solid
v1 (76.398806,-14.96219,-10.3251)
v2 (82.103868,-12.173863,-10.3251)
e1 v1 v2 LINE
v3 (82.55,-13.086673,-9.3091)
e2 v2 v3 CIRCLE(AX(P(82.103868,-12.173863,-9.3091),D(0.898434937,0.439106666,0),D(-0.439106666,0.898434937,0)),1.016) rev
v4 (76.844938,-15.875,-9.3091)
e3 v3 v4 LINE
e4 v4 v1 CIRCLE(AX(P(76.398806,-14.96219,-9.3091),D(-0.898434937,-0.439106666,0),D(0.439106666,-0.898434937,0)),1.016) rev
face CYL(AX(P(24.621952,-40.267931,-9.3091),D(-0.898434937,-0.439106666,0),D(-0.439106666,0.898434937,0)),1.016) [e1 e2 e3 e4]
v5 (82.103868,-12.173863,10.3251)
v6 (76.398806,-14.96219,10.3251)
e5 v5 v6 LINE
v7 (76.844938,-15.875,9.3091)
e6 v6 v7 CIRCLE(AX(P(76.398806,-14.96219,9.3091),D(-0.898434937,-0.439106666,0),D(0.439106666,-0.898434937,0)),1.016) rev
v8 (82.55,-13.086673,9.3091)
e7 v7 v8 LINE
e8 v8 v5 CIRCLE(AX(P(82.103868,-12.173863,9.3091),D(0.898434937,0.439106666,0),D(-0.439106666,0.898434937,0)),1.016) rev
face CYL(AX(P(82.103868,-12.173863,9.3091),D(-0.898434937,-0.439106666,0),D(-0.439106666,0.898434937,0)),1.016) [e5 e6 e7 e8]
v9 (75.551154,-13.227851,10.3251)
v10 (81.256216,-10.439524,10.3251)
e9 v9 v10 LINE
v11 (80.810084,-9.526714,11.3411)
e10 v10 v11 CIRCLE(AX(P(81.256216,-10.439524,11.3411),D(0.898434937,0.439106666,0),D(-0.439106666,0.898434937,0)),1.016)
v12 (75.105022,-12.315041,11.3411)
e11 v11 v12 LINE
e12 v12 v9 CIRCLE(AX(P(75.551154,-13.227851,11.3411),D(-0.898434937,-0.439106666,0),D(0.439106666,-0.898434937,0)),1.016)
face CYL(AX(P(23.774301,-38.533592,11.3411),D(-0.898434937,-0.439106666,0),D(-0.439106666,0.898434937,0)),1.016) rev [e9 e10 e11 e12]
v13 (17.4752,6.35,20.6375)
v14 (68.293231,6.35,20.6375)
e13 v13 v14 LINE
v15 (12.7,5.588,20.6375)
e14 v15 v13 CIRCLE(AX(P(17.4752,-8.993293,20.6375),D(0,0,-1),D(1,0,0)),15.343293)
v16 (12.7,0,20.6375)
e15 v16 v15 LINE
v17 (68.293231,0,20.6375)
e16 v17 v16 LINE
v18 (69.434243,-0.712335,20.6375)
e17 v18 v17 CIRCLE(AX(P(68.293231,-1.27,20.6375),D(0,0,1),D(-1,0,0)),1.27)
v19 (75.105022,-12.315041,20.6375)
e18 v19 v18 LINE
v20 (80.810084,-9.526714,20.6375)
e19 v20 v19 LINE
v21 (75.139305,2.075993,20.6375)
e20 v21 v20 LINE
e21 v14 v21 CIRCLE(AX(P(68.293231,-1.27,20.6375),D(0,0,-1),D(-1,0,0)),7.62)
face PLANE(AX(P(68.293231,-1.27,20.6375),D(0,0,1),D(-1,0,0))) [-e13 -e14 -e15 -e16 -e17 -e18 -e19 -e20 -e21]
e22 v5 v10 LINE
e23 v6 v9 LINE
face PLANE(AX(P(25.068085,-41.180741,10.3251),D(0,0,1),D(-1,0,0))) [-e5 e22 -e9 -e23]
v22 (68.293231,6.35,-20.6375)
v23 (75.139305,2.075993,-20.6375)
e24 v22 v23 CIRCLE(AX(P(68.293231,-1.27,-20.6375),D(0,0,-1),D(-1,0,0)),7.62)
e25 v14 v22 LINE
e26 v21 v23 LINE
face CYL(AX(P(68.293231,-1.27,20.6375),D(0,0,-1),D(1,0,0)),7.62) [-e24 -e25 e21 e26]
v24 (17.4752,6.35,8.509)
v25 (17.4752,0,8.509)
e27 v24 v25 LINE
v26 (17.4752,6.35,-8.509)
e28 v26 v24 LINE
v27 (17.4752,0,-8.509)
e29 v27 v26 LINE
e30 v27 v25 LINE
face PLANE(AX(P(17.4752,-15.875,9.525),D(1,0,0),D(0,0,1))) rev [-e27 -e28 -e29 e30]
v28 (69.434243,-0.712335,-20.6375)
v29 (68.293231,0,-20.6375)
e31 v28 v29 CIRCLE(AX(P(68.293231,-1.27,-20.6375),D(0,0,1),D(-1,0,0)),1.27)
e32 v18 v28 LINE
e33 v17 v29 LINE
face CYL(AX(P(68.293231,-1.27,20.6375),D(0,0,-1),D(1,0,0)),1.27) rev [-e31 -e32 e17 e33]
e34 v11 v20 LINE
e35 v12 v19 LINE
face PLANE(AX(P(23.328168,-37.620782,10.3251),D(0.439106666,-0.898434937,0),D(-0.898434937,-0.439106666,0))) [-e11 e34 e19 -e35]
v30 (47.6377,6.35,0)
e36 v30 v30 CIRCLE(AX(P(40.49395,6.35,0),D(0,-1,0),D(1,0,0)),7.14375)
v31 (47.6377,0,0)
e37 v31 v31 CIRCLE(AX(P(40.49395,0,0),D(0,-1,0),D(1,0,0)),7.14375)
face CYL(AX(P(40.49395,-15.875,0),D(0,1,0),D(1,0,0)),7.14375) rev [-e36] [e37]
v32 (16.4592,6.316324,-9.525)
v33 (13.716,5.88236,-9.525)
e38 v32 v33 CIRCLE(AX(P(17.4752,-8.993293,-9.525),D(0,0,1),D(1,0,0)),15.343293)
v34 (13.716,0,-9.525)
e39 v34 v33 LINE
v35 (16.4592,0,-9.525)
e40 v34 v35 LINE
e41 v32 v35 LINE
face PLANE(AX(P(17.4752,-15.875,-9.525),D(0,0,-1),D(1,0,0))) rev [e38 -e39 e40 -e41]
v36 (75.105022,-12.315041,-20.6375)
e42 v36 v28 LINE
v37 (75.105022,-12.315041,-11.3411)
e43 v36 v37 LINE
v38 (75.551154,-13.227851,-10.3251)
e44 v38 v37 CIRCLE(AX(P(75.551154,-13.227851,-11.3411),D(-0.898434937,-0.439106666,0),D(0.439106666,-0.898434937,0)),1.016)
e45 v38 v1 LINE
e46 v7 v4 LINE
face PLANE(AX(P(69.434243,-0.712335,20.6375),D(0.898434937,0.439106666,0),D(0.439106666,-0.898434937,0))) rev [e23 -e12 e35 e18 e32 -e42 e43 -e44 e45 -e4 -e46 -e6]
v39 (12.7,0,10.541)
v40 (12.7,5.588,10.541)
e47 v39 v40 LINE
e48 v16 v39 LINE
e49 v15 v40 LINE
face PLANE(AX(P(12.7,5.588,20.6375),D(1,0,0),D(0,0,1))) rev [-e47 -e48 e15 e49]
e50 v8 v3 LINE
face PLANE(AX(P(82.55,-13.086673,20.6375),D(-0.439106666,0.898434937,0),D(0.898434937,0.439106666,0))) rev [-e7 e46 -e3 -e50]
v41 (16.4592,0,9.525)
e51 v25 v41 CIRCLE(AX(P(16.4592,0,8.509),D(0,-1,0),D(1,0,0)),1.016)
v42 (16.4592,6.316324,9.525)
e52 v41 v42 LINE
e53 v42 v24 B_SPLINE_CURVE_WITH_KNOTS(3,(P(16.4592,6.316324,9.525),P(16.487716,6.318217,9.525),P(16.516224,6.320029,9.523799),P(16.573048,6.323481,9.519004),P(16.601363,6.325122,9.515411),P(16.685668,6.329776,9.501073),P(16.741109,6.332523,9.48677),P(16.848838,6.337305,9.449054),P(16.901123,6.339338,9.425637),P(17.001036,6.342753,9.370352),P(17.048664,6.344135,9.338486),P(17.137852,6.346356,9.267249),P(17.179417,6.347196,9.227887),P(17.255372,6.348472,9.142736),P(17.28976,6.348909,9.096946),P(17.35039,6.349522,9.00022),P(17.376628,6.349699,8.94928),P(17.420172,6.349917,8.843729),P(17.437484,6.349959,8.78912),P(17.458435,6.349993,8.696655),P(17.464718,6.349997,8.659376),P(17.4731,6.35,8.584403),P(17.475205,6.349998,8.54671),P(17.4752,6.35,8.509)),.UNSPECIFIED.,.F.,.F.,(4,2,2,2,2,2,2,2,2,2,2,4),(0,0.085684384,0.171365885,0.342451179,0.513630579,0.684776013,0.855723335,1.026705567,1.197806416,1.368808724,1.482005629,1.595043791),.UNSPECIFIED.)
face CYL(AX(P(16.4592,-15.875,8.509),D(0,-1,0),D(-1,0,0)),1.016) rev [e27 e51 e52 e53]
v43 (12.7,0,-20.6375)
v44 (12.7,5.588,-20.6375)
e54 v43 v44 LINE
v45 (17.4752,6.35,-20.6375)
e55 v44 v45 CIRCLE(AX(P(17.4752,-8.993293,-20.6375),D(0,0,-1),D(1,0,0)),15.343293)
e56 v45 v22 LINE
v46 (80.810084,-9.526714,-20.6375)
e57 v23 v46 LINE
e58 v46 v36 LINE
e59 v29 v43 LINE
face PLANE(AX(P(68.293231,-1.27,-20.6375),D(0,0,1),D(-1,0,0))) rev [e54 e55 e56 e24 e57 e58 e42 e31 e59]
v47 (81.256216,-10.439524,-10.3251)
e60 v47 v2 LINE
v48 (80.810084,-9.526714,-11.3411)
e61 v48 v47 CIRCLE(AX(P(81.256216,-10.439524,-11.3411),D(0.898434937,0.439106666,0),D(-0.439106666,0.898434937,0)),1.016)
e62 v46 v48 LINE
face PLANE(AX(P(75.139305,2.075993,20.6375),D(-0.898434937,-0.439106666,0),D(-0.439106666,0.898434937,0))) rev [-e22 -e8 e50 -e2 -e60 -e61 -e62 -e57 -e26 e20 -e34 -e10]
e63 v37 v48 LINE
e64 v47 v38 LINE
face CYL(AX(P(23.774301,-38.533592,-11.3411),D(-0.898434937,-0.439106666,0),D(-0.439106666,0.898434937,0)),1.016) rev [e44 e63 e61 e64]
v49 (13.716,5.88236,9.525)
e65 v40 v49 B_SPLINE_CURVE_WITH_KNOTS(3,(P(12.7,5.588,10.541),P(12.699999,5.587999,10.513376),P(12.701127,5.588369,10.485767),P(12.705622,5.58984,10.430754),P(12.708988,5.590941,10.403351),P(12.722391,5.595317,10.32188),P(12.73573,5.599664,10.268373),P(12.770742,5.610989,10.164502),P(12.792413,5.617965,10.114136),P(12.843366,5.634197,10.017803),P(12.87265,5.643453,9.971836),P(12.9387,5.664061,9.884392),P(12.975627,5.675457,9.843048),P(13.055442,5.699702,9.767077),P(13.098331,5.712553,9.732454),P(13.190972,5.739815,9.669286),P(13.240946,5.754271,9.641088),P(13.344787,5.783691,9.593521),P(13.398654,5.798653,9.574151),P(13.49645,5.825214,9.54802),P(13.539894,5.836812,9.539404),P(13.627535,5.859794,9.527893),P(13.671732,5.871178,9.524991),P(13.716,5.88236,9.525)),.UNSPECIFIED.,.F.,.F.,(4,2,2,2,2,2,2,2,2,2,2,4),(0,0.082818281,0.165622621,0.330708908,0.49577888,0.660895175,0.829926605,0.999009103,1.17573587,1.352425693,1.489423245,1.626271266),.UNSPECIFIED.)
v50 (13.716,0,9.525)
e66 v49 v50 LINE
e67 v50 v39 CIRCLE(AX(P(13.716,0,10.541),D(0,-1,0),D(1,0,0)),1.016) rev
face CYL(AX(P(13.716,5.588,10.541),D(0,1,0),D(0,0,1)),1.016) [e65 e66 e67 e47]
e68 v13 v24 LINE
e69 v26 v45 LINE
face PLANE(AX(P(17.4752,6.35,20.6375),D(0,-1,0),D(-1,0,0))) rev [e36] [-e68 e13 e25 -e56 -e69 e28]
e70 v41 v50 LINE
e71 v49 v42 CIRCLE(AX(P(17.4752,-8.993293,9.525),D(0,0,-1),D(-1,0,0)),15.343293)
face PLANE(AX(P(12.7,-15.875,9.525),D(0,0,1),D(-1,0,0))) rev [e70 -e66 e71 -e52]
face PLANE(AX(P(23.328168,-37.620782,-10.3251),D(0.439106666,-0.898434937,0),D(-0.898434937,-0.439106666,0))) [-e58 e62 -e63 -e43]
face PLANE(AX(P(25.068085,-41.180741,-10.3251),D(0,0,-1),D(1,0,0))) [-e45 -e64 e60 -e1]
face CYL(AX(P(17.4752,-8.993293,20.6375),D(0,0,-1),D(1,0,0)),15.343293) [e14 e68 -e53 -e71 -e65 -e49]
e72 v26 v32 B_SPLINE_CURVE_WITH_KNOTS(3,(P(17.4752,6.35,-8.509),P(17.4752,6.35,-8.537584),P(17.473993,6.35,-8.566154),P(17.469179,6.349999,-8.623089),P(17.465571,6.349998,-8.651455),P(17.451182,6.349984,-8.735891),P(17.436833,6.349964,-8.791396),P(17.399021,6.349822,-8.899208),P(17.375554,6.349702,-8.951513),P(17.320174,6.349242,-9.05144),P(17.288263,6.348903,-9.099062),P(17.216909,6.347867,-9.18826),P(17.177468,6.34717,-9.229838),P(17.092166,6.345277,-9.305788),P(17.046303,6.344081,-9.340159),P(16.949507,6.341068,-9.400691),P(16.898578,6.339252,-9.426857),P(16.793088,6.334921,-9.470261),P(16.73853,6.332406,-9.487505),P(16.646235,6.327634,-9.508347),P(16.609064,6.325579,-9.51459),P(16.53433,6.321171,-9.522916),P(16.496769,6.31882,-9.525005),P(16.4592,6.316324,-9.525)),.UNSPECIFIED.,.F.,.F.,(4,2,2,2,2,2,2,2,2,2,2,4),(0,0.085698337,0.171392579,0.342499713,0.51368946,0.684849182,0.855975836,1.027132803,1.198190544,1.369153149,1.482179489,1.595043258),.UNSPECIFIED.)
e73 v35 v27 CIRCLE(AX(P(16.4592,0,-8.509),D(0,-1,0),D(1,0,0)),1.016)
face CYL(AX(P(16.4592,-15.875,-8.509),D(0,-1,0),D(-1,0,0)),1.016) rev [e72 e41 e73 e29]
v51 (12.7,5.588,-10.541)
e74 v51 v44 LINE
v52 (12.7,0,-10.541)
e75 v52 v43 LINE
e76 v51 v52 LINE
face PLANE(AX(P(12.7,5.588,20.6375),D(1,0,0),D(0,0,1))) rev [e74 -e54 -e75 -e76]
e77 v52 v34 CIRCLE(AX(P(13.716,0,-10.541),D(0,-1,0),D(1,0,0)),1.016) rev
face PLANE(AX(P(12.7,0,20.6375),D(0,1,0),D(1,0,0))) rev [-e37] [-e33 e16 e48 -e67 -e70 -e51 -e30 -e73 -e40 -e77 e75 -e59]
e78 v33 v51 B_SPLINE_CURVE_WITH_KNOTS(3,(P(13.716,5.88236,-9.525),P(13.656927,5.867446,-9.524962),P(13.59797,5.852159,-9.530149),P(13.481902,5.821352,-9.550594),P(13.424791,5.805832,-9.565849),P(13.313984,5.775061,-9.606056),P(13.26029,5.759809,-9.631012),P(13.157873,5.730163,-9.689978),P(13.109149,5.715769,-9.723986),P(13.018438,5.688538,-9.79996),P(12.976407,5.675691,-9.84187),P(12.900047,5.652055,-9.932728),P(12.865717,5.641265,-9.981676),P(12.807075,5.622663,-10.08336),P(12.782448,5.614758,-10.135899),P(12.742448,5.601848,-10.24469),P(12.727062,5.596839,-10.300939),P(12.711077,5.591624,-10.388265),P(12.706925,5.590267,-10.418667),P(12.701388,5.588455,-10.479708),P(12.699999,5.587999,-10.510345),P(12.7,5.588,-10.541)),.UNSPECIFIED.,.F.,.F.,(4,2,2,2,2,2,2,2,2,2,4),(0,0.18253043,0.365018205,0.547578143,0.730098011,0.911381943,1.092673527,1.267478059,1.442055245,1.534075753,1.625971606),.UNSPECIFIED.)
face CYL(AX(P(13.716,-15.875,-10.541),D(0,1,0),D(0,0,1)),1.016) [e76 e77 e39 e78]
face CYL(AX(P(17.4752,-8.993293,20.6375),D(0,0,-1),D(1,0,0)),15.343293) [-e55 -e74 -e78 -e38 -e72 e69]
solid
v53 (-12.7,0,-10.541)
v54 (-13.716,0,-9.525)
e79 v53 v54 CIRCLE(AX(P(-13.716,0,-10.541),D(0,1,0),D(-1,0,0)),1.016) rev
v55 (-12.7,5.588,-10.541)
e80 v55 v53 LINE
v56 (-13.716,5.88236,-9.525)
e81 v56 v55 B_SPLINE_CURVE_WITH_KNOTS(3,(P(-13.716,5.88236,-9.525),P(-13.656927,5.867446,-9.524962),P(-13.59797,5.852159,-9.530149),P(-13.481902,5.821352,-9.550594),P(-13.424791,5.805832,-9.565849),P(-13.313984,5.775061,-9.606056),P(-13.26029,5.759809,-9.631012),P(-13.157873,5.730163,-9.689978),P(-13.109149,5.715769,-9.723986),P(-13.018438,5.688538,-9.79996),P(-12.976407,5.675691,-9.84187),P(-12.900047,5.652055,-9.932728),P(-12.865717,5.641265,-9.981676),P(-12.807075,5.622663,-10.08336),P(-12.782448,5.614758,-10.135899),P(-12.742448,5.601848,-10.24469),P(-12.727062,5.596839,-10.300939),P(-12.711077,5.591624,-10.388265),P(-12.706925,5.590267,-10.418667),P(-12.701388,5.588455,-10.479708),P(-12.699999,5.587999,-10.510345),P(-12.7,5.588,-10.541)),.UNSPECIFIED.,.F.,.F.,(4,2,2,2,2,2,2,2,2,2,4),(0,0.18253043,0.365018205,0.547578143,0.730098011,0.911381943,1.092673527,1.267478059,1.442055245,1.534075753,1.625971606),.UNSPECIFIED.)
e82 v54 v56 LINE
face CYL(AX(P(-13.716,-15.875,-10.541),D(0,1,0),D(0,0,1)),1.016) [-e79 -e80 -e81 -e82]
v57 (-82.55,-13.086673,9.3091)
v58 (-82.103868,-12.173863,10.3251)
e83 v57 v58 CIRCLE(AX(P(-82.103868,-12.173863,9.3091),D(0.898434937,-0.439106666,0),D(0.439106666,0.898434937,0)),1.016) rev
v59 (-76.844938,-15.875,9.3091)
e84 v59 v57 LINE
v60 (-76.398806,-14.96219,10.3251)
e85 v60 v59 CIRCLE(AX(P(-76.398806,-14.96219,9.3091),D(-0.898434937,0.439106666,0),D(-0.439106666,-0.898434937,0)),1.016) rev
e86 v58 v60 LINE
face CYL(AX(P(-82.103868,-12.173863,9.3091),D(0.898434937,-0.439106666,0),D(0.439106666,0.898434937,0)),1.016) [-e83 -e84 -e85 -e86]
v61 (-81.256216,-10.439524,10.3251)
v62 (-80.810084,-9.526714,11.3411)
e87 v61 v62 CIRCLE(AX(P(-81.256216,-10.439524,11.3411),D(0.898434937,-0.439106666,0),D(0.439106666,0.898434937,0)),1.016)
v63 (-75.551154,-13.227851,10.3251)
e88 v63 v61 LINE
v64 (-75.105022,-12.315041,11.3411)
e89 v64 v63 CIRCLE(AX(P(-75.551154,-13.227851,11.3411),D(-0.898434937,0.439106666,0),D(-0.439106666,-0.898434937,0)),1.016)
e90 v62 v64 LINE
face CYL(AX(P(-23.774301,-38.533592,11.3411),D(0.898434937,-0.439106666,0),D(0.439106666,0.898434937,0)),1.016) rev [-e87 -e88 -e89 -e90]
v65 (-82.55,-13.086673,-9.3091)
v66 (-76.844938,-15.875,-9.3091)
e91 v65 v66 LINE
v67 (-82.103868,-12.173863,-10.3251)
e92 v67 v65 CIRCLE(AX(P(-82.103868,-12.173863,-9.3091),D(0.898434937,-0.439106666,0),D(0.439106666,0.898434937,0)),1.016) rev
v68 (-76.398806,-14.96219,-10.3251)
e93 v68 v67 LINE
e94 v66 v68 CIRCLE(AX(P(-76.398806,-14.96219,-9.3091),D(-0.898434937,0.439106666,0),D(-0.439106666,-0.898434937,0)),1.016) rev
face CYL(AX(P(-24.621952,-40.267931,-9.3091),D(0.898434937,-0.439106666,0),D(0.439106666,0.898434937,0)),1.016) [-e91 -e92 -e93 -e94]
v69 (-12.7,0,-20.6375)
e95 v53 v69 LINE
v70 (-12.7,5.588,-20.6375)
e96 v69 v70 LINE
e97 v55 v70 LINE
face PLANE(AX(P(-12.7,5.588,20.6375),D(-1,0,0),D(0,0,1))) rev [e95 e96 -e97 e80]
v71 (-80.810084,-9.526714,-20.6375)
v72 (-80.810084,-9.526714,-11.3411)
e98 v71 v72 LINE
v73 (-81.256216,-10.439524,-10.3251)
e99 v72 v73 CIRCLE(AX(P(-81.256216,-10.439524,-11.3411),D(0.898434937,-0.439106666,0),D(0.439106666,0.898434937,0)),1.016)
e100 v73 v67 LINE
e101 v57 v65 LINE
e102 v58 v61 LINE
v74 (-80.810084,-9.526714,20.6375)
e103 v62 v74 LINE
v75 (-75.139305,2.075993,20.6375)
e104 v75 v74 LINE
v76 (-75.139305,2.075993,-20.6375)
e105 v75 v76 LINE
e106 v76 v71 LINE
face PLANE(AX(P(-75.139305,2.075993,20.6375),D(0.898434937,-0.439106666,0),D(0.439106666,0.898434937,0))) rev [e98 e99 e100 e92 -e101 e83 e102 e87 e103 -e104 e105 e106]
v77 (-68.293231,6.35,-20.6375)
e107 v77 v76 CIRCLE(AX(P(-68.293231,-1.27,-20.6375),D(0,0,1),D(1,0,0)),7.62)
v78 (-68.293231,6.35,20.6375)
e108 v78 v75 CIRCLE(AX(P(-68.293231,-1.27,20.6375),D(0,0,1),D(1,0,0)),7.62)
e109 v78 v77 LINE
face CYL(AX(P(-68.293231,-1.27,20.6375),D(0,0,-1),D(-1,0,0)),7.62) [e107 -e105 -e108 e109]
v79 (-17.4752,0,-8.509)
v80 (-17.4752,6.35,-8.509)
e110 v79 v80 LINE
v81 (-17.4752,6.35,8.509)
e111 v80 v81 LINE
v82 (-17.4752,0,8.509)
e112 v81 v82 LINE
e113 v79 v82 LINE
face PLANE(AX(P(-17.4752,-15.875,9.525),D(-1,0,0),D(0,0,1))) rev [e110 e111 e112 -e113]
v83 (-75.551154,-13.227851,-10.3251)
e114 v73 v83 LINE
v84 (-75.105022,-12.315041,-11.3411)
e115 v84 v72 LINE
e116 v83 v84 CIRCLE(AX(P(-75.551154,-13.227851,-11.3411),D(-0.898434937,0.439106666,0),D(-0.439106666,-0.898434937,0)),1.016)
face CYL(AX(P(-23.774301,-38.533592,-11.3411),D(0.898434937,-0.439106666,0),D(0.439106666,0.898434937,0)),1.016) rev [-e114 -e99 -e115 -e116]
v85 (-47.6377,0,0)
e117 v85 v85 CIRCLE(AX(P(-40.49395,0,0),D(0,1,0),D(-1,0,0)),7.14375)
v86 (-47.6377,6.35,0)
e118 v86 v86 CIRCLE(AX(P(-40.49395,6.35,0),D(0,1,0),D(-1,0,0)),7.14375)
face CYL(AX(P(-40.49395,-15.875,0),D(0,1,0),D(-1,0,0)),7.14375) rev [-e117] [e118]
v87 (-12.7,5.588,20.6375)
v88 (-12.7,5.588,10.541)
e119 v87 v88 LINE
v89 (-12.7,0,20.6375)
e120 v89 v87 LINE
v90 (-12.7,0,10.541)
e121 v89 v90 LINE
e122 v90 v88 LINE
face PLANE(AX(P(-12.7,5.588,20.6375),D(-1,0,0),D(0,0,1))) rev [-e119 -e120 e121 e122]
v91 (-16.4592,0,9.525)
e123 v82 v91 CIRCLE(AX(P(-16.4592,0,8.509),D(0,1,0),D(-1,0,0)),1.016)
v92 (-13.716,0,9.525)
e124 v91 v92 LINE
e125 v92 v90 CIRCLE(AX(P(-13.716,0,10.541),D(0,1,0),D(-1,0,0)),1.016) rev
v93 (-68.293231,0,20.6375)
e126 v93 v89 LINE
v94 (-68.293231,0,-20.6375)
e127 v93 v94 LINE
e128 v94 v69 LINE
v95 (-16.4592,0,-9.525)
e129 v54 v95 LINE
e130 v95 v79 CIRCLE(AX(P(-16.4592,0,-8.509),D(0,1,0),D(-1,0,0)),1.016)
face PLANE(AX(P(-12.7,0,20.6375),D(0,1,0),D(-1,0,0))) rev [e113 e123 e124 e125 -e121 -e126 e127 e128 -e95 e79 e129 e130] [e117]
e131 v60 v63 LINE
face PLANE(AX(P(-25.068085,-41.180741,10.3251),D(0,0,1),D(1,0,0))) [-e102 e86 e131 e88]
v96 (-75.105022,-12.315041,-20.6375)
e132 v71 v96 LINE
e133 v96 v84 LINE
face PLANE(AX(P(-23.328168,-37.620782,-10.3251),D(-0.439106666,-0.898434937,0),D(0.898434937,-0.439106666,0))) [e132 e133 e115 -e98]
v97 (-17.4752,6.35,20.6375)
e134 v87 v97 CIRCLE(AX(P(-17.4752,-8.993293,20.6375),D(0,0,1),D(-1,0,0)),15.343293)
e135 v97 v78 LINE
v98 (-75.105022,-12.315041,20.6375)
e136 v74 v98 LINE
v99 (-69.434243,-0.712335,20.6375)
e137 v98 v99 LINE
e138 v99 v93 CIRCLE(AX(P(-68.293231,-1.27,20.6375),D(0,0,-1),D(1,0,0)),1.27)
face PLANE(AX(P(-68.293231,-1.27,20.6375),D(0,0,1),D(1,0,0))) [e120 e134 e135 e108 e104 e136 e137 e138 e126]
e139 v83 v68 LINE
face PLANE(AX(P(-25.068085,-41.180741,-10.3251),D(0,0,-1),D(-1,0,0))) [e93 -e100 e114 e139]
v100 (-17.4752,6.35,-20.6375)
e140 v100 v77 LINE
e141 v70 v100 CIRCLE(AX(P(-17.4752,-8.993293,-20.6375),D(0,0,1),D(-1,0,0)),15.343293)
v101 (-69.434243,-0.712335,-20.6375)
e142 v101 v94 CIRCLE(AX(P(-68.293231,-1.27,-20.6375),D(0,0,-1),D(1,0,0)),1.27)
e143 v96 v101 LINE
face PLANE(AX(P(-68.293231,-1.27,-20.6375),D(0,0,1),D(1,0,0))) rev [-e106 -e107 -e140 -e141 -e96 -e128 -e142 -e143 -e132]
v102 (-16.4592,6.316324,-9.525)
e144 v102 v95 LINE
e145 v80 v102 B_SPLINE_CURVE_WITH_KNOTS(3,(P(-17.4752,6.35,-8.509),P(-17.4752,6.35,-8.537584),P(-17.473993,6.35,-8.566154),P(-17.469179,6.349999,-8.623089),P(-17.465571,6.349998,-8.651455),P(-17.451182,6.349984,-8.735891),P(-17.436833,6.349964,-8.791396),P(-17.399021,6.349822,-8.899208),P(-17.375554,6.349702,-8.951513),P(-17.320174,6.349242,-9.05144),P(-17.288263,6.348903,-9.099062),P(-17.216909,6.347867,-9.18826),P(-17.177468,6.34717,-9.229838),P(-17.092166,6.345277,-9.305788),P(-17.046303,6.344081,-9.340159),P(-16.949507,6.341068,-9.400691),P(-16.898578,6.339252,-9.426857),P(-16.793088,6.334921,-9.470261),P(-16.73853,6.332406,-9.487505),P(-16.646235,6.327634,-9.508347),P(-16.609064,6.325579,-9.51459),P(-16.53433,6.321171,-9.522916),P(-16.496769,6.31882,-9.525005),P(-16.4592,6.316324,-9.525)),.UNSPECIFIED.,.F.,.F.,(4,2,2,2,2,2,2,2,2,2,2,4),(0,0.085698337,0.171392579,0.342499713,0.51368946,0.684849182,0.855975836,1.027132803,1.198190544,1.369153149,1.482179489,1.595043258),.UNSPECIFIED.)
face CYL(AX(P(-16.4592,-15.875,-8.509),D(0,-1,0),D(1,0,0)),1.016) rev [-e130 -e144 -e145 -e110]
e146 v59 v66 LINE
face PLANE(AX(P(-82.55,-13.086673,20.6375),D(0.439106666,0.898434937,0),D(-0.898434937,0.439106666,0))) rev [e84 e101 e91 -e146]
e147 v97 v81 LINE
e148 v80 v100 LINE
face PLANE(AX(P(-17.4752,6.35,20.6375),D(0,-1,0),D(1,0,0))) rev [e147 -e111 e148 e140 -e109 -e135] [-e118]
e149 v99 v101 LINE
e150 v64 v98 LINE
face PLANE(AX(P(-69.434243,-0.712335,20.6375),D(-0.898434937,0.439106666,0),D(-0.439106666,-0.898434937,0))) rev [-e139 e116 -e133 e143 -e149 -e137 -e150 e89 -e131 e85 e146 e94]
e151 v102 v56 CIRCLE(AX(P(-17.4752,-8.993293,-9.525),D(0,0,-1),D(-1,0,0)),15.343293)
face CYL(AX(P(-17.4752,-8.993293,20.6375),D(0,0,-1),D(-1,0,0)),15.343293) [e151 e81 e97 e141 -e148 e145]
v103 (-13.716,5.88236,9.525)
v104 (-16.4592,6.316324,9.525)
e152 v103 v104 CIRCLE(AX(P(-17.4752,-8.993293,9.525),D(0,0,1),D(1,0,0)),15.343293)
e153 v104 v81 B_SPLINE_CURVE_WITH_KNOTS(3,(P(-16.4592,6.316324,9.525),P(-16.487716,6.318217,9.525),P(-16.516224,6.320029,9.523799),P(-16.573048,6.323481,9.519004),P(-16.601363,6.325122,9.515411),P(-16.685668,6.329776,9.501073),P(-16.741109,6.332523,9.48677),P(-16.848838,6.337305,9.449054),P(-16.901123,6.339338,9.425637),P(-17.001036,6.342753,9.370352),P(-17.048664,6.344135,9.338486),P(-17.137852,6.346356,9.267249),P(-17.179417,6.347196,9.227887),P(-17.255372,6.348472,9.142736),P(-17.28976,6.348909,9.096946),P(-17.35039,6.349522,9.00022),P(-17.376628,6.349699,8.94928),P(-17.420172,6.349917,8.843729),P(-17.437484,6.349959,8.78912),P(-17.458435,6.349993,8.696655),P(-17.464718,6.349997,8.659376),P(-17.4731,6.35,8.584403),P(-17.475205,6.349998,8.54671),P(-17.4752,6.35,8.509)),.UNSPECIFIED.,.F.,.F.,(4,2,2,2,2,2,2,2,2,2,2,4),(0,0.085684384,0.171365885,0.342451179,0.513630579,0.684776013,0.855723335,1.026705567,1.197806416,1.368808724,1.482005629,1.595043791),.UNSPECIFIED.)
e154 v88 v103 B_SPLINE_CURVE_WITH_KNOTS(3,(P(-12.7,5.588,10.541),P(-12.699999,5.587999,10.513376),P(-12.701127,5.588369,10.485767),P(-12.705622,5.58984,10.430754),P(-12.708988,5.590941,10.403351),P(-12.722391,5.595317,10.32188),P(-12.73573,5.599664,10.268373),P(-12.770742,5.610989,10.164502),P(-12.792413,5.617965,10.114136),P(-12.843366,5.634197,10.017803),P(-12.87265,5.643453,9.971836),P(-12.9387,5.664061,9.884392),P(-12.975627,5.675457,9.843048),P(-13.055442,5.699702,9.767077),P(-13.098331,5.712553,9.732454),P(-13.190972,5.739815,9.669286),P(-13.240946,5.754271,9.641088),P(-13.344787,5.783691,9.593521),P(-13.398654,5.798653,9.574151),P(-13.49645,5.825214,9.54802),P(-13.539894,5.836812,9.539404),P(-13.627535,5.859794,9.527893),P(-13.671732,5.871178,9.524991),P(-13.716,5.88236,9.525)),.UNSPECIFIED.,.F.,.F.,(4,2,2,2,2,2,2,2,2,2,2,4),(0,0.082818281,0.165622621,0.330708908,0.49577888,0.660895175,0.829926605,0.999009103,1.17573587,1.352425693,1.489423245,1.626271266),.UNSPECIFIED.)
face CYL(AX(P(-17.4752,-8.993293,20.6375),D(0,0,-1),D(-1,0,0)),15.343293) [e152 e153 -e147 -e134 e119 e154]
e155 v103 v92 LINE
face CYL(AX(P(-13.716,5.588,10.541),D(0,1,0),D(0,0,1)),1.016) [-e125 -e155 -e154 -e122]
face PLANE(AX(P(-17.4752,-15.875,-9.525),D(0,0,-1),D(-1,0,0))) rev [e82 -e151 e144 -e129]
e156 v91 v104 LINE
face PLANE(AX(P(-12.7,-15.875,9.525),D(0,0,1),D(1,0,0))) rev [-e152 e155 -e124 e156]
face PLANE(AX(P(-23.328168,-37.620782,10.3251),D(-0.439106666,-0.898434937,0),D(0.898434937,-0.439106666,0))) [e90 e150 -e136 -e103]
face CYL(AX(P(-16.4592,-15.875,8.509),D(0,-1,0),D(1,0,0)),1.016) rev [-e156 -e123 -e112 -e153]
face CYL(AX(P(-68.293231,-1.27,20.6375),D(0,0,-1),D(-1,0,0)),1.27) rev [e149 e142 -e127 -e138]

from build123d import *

# Parameters (mm, degrees)
BOSS_EXTRUDE1_DEPTH      = 20.6375
BOSS_EXTRUDE1_DEPTH_BACK = 20.6375
SKETCH6_R                = 7.14375
SKETCH6_W                = 4.7752
SKETCH6_H                = 19.05
CUT_EXTRUDE1_DEPTH       = 88.945207551
SKETCH7_W                = 10.3124
SKETCH7_H                = 3.9624
CUT_EXTRUDE_3_DEPTH      = 767.15686601
FILLET1_R                = 1.016


with BuildPart() as part:
    # Sketch5 → Boss-Extrude1 (new, two sides: drawn at the far end of the back side and taken through both)
    with BuildSketch(Plane.XY.offset(-BOSS_EXTRUDE1_DEPTH_BACK)):
        with BuildLine():
            Line((-17.4752, 6.35), (-68.293230581, 6.35))
            ThreePointArc((-68.293230581, 6.35), (-72.328570401, 5.193778503), (-75.139304801, 2.075992792))
            Line((-75.139304801, 2.075992792), (-82.55, -13.086672673))
            Line((-82.55, -13.086672673), (-76.844938149, -15.875))
            Line((-76.844938149, -15.875), (-69.434242951, -0.712334535))
            ThreePointArc((-69.434242951, -0.712334535), (-68.965787217, -0.192703583), (-68.293230581, 0))
            Line((-68.293230581, 0), (-12.7, 0))
            Line((-12.7, 0), (-12.7, 5.588))
            ThreePointArc((-12.7, 5.588), (-15.057392158, 6.158302475), (-17.4752, 6.35))
        make_face()
    extrude(amount=BOSS_EXTRUDE1_DEPTH + BOSS_EXTRUDE1_DEPTH_BACK)

    # Sketch6 → Cut-Extrude1 (cut, through all)
    with BuildSketch(Plane(origin=(0, 6.35, 0), x_dir=(1, 0, 0), z_dir=(0, 1, 0))):
        with Locations(Location((-40.49395, 0, 0), (0, 0, 180))):
            Circle(SKETCH6_R)
        with Locations((-15.0876, 0)):
            Rectangle(SKETCH6_W, SKETCH6_H)
    extrude(amount=-CUT_EXTRUDE1_DEPTH, mode=Mode.SUBTRACT)

    # Sketch7 → Cut-Extrude 3 (cut, through all)
    with BuildSketch(Plane(origin=(-396.872635609, -656.207033754, 0), x_dir=(0, 0, 1), z_dir=(0.8984349370992722, -0.4391066656285541, 0))):
        with Locations((15.4813, -717.804165609)):
            Rectangle(SKETCH7_W, SKETCH7_H)
        with Locations((-15.4813, -717.804165609)):
            Rectangle(SKETCH7_W, SKETCH7_H)
    extrude(amount=CUT_EXTRUDE_3_DEPTH, mode=Mode.SUBTRACT)

    # Fillet1
    # the kernel refuses this fillet: 1.016 mm, written as the material it adds along each edge
    with BuildSketch(Plane(origin=(-17.4752, 8.89, -9.525), x_dir=(0, 0, 1), z_dir=(0, -1, 0))) as fillet1_piece_1_section:
        with BuildLine():
            CenterArc((FILLET1_R, -FILLET1_R), FILLET1_R, 90, 90)
            Line((0, -FILLET1_R), (0, 0))
            Line((0, 0), (FILLET1_R, 0))
        make_face()
    fillet1_piece_1 = extrude(amount=8.89, mode=Mode.PRIVATE)
    fillet1_piece_1 = fillet1_piece_1 & Plane(origin=(-17.4752, -8.993293333, -9.297995712), x_dir=(0.31122392671890353, 0.9503366074384731, 0), z_dir=(0, 0, -1)) * Cylinder(15.343293333, 22, mode=Mode.PRIVATE)
    add(fillet1_piece_1)
    with BuildSketch(Plane(origin=(-17.4752, 8.89, 9.525), x_dir=(1, 0, 0), z_dir=(0, -1, 0))) as fillet1_piece_2_section:
        with BuildLine():
            CenterArc((FILLET1_R, -FILLET1_R), FILLET1_R, 90, 90)
            Line((0, -FILLET1_R), (0, 0))
            Line((0, 0), (FILLET1_R, 0))
        make_face()
    fillet1_piece_2 = extrude(amount=8.89, mode=Mode.PRIVATE)
    fillet1_piece_2 = fillet1_piece_2 & Plane(origin=(-17.4752, -8.993293333, 9.29799564), x_dir=(0.31122392671890353, 0.9503366074384731, 0), z_dir=(0, 0, -1)) * Cylinder(15.343293333, 22, mode=Mode.PRIVATE)
    add(fillet1_piece_2)
    with BuildSketch(Plane(origin=(-80.810083748, -9.526714078, 10.3251), x_dir=(0, 0, 1), z_dir=(0.8984349370992722, -0.4391066656285541, 0))) as fillet1_piece_3:
        with BuildLine():
            CenterArc((FILLET1_R, FILLET1_R), FILLET1_R, 180, 90)
            Line((0, FILLET1_R), (0, 0))
            Line((0, 0), (FILLET1_R, 0))
        make_face()
    extrude(amount=6.35)
    with BuildSketch(Plane(origin=(-80.810083748, -9.526714078, -10.3251), x_dir=(0, 0, -1), z_dir=(0.8984349370992722, -0.4391066656285541, 0))) as fillet1_piece_4:
        with BuildLine():
            CenterArc((FILLET1_R, -FILLET1_R), FILLET1_R, 90, 90)
            Line((0, -FILLET1_R), (0, 0))
            Line((0, 0), (FILLET1_R, 0))
        make_face()
    extrude(amount=6.35)
    # the kernel refuses this fillet: 1.016 mm, written as the material it takes off along each edge
    with BuildSketch(Plane(origin=(-12.7, 8.128, -9.525), x_dir=(0, 0, -1), z_dir=(0, -1, 0)), Plane(origin=(-12.7, 8.128, 9.525), x_dir=(-1, 0, 0), z_dir=(0, -1, 0))) as fillet1_2_piece_1:
        with BuildLine():
            CenterArc((FILLET1_R, -FILLET1_R), FILLET1_R, 90, 90)
            Line((0, -FILLET1_R), (0, 0))
            Line((0, 0), (FILLET1_R, 0))
        make_face()
    extrude(amount=10.668, mode=Mode.SUBTRACT)
    with BuildSketch(Plane(origin=(-84.83202474, -11.971341743, 10.3251), x_dir=(0, 0, -1), z_dir=(0.8984349370992722, -0.4391066656285541, 0)), Plane(origin=(-84.83202474, -11.971341743, -10.3251), x_dir=(0.43910666562855405, 0.8984349370992722, 0), z_dir=(0.8984349370992722, -0.4391066656285541, 0))) as fillet1_2_piece_2:
        with BuildLine():
            CenterArc((FILLET1_R, FILLET1_R), FILLET1_R, 180, 90)
            Line((0, FILLET1_R), (0, 0))
            Line((0, 0), (FILLET1_R, 0))
        make_face()
    extrude(amount=11.43, mode=Mode.SUBTRACT)


with BuildPart() as body_2:
    # Mirror4: mirrored copy
    add(part.part.mirror(Plane(origin=(0, 0, 0), x_dir=(0, 0, 1), z_dir=(1, 0, 0))))


solid = Compound([part.part, body_2.part])
